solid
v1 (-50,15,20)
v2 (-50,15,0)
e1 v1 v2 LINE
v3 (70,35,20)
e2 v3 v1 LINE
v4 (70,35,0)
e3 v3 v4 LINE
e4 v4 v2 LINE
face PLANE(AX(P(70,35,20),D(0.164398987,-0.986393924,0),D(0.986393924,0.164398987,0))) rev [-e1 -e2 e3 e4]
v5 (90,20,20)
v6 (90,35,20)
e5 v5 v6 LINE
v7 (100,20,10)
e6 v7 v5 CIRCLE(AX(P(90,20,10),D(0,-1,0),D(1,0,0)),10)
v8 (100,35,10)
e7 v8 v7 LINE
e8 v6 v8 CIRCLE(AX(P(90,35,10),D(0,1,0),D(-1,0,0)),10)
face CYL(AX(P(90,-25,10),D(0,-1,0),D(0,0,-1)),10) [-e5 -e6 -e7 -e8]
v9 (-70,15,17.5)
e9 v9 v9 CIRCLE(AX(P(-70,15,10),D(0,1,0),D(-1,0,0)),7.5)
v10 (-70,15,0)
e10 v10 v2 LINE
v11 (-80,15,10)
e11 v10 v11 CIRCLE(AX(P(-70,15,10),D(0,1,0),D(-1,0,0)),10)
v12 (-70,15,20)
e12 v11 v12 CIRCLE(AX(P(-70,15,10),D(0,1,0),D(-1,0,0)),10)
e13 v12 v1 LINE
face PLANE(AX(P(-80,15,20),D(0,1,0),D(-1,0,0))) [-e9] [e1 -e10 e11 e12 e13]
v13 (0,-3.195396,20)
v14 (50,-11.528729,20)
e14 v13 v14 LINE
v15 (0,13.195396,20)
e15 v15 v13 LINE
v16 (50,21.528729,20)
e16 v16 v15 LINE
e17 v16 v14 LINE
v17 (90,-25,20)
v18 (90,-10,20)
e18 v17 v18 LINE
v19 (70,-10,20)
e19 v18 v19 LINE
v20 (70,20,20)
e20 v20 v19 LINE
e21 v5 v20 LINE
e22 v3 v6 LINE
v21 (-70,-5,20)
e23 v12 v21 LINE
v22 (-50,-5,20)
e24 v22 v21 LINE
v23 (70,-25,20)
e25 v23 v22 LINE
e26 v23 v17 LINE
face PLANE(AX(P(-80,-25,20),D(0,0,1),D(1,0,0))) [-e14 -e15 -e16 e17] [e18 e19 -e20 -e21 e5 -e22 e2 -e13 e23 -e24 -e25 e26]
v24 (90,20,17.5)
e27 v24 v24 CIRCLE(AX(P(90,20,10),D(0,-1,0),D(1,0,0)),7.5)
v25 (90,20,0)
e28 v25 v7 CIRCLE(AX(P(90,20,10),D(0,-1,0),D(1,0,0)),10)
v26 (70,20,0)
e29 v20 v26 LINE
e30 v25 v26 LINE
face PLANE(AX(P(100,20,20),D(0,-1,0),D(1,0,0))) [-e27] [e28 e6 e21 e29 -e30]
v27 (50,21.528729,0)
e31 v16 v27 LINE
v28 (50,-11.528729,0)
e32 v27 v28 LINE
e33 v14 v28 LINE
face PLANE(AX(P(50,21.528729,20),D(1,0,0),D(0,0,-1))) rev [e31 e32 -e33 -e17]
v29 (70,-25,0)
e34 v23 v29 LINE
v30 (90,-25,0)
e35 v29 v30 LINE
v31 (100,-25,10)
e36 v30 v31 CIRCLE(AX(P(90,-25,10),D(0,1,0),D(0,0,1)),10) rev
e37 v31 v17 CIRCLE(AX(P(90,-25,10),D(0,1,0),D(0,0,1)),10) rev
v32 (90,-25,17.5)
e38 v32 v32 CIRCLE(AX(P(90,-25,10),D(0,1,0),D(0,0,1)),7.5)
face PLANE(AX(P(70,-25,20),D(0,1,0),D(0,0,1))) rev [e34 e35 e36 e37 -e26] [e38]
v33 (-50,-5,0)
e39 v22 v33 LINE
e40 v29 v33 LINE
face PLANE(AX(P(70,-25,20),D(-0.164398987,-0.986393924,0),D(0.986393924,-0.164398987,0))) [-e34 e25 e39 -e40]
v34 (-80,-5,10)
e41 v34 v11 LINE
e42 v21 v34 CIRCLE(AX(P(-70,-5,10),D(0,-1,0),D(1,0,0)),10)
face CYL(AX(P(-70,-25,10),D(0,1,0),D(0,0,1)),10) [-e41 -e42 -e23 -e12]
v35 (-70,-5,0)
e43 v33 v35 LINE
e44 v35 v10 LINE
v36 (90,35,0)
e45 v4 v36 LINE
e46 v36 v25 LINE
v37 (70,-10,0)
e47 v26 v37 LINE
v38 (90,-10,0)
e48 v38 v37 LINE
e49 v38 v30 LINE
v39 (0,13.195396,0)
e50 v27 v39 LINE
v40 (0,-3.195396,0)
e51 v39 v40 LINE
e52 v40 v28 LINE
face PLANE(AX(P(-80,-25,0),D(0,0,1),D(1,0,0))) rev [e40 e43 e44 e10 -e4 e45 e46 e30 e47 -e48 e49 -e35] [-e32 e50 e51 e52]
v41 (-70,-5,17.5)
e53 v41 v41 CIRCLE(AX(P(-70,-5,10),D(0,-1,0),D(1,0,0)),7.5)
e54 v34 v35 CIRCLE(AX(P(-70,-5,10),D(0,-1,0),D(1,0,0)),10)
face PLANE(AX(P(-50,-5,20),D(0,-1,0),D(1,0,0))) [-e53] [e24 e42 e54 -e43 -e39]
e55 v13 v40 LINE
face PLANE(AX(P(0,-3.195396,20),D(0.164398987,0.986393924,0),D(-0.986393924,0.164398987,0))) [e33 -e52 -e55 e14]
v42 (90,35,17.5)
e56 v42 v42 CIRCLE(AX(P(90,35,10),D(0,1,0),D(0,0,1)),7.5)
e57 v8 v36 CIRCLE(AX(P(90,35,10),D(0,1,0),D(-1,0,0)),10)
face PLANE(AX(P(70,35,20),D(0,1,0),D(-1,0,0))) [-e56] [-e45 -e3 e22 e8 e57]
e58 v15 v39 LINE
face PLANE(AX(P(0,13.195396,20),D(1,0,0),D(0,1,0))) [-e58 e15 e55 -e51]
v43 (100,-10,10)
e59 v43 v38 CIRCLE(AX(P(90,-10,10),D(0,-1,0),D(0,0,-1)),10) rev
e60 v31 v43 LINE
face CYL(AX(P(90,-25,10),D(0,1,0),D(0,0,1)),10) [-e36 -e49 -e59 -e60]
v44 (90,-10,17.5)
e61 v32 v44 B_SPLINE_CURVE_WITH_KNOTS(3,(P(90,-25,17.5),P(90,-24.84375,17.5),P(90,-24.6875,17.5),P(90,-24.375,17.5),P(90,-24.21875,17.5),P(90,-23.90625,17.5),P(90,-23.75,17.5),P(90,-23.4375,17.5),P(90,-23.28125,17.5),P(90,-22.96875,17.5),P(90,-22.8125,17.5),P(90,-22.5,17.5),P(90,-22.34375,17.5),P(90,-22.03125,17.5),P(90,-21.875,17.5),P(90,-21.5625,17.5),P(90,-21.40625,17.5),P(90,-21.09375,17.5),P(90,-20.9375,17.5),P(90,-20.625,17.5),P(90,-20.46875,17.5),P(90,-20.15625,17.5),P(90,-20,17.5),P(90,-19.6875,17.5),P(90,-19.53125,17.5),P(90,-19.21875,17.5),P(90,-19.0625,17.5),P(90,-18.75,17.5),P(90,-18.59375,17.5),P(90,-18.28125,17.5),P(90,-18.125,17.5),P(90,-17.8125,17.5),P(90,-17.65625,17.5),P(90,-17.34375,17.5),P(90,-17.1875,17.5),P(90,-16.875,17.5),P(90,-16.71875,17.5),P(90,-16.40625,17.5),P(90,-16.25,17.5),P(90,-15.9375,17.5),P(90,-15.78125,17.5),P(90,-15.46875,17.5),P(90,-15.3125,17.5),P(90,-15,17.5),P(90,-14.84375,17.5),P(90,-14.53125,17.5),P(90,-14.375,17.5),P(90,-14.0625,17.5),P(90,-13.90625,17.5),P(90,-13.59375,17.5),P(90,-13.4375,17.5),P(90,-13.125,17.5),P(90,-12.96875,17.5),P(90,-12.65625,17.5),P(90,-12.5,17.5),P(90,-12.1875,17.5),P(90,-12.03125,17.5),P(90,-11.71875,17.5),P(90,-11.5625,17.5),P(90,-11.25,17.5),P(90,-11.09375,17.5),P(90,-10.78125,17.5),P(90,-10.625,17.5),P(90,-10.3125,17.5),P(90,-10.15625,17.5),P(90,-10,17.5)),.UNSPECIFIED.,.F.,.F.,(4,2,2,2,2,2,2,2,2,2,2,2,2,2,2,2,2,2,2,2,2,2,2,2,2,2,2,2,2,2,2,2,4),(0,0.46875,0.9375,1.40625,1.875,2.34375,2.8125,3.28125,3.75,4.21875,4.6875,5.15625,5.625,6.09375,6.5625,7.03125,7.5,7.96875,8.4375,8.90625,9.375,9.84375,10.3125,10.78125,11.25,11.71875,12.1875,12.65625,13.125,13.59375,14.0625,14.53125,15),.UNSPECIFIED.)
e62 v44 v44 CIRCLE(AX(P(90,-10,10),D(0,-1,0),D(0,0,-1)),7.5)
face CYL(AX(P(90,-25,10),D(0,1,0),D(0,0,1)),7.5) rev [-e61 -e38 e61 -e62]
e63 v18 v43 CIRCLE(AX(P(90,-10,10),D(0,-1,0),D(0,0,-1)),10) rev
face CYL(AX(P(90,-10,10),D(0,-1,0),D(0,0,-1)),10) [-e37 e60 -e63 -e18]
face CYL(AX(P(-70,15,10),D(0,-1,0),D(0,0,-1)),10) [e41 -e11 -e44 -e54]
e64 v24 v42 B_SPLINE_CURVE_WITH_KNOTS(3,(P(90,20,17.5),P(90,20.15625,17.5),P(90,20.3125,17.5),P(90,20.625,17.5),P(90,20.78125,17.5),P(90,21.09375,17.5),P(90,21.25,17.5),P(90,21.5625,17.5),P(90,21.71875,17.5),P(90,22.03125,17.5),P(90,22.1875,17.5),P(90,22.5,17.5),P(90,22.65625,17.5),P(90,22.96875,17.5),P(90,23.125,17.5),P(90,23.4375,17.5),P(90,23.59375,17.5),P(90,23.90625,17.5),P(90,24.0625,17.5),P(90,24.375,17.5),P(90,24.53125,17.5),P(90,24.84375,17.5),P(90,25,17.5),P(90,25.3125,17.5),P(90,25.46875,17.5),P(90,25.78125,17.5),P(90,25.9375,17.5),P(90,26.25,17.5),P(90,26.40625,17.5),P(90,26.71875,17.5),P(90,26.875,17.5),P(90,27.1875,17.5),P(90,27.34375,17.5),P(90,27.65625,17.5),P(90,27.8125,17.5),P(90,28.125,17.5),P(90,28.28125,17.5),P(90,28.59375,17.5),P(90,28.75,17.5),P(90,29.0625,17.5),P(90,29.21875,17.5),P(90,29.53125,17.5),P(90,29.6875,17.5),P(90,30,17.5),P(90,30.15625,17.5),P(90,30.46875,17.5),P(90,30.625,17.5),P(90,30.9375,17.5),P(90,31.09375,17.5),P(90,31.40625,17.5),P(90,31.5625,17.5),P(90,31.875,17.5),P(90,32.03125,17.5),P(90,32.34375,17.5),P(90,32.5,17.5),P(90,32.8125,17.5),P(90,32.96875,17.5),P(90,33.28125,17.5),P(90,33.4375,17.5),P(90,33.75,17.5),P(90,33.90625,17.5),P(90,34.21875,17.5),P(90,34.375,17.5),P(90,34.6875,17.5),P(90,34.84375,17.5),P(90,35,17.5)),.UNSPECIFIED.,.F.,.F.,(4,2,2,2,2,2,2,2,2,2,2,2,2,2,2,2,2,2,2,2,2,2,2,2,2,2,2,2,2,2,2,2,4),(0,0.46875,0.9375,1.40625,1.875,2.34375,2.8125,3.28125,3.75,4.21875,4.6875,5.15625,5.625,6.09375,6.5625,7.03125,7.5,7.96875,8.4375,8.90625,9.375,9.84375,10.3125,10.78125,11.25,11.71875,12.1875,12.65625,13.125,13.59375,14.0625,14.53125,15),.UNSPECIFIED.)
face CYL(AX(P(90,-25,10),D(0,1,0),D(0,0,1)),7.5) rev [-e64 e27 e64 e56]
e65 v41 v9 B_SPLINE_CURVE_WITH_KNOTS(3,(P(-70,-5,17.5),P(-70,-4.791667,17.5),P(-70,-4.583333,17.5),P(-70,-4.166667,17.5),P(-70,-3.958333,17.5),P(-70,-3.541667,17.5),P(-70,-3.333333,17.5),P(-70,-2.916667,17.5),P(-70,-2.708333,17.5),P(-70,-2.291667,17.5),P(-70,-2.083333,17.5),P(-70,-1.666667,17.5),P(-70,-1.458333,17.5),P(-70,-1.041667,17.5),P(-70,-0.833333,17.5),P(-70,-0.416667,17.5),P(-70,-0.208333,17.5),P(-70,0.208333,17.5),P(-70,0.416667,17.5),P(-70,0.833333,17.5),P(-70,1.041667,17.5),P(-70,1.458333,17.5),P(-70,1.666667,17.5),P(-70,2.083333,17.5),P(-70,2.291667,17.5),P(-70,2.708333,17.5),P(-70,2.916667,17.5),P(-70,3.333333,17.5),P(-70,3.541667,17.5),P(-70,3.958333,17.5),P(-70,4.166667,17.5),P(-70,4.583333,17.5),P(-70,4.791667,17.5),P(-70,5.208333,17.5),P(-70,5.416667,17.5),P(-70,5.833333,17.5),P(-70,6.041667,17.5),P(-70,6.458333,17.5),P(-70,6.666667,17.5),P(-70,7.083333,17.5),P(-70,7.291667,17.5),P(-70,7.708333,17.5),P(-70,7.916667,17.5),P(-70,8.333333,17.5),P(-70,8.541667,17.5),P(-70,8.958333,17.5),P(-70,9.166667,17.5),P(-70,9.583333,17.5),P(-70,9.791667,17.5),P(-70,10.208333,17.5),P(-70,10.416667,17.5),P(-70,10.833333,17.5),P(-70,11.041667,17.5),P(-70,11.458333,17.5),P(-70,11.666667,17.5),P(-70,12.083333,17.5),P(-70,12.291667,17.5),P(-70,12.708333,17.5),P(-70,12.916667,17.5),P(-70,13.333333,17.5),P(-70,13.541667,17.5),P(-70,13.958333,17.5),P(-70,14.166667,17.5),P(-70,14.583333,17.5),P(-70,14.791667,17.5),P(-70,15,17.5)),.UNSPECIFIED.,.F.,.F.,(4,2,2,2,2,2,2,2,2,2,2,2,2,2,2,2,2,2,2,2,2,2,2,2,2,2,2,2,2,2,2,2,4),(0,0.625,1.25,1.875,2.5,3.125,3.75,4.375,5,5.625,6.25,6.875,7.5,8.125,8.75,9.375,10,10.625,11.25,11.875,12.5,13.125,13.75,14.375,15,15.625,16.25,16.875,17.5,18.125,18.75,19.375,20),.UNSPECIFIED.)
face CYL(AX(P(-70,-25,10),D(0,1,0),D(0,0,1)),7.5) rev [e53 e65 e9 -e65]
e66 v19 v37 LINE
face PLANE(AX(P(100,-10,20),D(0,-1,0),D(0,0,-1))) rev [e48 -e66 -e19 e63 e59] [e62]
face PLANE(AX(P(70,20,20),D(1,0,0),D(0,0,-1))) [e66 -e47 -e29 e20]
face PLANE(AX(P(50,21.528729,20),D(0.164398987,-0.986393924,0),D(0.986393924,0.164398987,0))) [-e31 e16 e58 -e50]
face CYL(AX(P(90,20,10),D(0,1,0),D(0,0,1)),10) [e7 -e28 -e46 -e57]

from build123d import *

# Parameters (mm, degrees)
BASE_EXTRUDE_DEPTH      = 20
FILLET1_R               = 10
CUT_EXTRUDE1_DEPTH      = 108.819293264
CUT_EXTRUDE1_DEPTH_BACK = 108.819293264
SKETCH2_R               = 7.5


with BuildPart() as part:
    # Sketch1 → Base-Extrude (new body)
    with BuildSketch(Plane.XY):
        Polygon((-80, 15), (-50, 15), (70, 35), (100, 35), (100, 20), (70, 20), (70, -10), (100, -10), (100, -25), (70, -25), (-50, -5), (-80, -5), align=None)
        Polygon((50, 21.528729116), (0, 13.195395783), (0, -3.195395783), (50, -11.528729116), align=None, mode=Mode.SUBTRACT)
    extrude(amount=BASE_EXTRUDE_DEPTH)

    # Fillet1
    # the kernel refuses this fillet: 10 mm, written as the material it takes off along each edge
    with BuildSketch(Plane(origin=(100, 60, 0), x_dir=(0, 0, 1), z_dir=(0, -1, 0)), Plane(origin=(100, 15, 0), x_dir=(0, 0, 1), z_dir=(0, -1, 0))) as fillet1_piece_1:
        with BuildLine():
            CenterArc((FILLET1_R, FILLET1_R), FILLET1_R, 180, 90)
            Line((0, FILLET1_R), (0, 0))
            Line((0, 0), (FILLET1_R, 0))
        make_face()
    extrude(amount=65, mode=Mode.SUBTRACT)
    with BuildSketch(Plane(origin=(-80, -30, 0), x_dir=(0, 0, 1), z_dir=(0, 1, 0))) as fillet1_piece_2:
        with BuildLine():
            CenterArc((FILLET1_R, FILLET1_R), FILLET1_R, 180, 90)
            Line((0, FILLET1_R), (0, 0))
            Line((0, 0), (FILLET1_R, 0))
        make_face()
    extrude(amount=70, mode=Mode.SUBTRACT)
    with BuildSketch(Plane(origin=(100, 15, 20), x_dir=(0, 0, -1), z_dir=(0, -1, 0)), Plane(origin=(100, 60, 20), x_dir=(0, 0, -1), z_dir=(0, -1, 0))) as fillet1_piece_3:
        with BuildLine():
            CenterArc((FILLET1_R, -FILLET1_R), FILLET1_R, 90, 90)
            Line((0, -FILLET1_R), (0, 0))
            Line((0, 0), (FILLET1_R, 0))
        make_face()
    extrude(amount=65, mode=Mode.SUBTRACT)
    with BuildSketch(Plane(origin=(-80, -30, 20), x_dir=(0, 0, -1), z_dir=(0, 1, 0))) as fillet1_piece_4:
        with BuildLine():
            CenterArc((FILLET1_R, -FILLET1_R), FILLET1_R, 90, 90)
            Line((0, -FILLET1_R), (0, 0))
            Line((0, 0), (FILLET1_R, 0))
        make_face()
    extrude(amount=70, mode=Mode.SUBTRACT)

    # Sketch2 → Cut-Extrude1 (cut, two sides: drawn at the far end of the back side and taken through both)
    with BuildSketch(Plane(origin=(0, 0, 0), x_dir=(1, 0, 0), z_dir=(0, 1, 0)).offset(-CUT_EXTRUDE1_DEPTH_BACK)):
        with Locations(Location((90, -10, 0), (0, 0, 270))):
            Circle(SKETCH2_R)
        with Locations(Location((-70, -10, 0), (0, 0, 270))):
            Circle(SKETCH2_R)
    extrude(amount=CUT_EXTRUDE1_DEPTH + CUT_EXTRUDE1_DEPTH_BACK, mode=Mode.SUBTRACT)


solid = part.part
